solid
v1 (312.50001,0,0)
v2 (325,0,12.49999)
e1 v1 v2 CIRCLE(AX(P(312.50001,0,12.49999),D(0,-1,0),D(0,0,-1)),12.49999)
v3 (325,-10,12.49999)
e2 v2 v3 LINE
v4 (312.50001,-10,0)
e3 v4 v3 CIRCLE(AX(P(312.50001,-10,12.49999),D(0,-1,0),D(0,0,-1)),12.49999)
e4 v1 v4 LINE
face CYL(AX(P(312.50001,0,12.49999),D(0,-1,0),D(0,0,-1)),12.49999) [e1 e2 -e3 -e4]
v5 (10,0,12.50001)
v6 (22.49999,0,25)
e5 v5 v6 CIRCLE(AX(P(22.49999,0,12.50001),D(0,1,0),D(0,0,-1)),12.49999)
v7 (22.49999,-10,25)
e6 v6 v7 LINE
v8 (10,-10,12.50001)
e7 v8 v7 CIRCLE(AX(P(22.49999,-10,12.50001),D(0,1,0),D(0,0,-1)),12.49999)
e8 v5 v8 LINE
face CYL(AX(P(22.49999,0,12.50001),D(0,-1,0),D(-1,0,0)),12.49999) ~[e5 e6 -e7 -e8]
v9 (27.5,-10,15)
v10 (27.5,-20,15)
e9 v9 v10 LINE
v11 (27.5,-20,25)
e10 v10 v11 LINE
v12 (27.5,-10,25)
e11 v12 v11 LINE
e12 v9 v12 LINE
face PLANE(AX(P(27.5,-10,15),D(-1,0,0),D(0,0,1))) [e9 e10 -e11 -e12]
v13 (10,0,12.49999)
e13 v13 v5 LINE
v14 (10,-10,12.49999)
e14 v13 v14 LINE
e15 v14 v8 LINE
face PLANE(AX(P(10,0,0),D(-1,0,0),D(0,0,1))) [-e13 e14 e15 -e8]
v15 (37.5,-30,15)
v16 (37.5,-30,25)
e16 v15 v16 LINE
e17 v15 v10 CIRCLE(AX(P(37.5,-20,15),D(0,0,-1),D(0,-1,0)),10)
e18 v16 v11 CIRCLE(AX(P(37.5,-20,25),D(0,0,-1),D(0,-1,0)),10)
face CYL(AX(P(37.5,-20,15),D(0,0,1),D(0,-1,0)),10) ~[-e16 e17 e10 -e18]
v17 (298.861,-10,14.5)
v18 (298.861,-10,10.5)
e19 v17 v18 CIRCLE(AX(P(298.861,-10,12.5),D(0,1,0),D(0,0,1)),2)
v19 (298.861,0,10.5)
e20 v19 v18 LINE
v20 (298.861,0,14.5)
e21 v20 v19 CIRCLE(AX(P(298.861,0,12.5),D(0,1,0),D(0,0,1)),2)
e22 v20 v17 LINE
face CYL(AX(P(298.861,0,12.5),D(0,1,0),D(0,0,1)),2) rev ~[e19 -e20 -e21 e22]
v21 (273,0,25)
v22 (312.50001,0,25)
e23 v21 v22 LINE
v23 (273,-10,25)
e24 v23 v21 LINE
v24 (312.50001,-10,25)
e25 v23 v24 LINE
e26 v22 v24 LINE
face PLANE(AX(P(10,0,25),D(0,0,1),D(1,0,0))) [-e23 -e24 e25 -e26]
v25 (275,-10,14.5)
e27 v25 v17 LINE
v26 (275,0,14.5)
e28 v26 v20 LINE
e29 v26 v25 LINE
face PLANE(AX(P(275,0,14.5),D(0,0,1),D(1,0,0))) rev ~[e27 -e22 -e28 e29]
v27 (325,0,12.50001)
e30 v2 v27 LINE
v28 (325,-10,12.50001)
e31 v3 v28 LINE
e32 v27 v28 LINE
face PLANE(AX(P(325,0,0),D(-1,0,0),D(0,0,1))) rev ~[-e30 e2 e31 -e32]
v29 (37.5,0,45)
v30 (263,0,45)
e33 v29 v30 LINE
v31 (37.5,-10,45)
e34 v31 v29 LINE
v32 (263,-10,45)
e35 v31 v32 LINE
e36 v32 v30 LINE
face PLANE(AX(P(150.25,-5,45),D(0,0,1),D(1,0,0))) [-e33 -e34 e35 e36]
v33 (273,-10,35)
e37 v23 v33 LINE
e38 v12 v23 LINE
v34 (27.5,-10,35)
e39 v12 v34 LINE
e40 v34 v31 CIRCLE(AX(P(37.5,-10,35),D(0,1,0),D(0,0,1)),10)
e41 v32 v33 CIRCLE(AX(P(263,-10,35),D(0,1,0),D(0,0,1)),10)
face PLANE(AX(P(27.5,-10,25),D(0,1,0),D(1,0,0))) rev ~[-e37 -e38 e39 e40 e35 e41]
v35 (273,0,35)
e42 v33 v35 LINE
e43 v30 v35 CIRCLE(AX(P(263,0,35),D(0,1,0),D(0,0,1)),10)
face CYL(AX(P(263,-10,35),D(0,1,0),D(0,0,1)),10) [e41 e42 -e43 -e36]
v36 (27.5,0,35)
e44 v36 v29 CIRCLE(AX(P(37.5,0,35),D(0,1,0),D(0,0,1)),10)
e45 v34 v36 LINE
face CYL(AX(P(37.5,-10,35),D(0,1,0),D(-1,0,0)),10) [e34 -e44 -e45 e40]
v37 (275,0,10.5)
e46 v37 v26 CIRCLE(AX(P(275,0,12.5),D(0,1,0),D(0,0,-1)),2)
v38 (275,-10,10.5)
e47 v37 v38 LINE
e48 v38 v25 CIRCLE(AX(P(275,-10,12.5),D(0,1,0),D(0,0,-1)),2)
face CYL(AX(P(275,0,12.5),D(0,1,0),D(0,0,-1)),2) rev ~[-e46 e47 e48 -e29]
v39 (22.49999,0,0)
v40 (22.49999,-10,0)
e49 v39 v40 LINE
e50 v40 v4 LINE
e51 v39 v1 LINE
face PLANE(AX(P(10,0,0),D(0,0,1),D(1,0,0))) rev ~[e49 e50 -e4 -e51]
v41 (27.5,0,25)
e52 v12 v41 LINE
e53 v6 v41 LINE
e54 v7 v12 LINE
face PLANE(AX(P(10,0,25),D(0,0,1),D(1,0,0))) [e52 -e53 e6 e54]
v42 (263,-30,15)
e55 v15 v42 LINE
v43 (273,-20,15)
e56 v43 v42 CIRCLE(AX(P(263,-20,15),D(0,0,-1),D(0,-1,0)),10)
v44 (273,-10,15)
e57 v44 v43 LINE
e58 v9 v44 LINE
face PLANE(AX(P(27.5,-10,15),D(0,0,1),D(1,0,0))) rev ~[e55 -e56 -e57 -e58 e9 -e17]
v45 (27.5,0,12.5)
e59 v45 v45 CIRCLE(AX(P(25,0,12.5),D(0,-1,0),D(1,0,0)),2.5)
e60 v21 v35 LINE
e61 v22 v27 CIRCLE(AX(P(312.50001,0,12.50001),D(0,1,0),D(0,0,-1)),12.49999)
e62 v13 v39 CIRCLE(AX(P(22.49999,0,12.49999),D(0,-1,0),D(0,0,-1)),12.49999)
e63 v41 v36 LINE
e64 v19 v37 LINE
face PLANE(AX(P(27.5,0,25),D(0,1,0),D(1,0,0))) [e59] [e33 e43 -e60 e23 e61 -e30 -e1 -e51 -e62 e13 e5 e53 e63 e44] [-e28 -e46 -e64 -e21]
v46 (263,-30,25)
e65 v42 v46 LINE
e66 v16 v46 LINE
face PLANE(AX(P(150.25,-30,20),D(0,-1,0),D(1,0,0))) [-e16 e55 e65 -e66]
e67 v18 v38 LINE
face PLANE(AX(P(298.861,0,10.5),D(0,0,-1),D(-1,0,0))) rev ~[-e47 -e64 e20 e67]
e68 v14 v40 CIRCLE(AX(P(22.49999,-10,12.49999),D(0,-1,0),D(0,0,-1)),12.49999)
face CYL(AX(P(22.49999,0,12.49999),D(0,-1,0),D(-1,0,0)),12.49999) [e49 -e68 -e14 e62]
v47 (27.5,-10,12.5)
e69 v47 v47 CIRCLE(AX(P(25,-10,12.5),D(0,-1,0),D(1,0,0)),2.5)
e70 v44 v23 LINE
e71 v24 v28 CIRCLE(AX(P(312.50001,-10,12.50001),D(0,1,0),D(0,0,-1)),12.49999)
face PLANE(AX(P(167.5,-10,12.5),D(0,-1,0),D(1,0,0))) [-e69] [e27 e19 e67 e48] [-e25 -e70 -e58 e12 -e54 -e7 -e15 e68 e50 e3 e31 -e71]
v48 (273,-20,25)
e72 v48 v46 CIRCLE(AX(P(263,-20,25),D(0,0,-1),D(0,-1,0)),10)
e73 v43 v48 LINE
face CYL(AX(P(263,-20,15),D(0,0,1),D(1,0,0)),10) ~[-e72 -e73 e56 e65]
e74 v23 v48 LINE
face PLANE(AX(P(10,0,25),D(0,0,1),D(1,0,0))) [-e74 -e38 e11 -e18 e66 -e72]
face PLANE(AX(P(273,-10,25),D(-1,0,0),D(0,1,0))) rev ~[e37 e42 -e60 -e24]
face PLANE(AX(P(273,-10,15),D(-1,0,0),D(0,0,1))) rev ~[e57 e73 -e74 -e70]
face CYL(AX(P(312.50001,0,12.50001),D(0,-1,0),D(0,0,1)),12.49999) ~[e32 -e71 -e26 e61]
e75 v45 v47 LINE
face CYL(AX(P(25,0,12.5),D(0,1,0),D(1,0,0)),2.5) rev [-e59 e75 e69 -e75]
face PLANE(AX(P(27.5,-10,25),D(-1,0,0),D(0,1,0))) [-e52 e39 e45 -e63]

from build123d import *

# Parameters (mm, degrees)
F0_W     = 315
F0_H     = 25
F0_R     = 2.5
F1_DEPTH = 10
F2_R     = 12.49999
F3_W     = 245.5
F3_H     = 10
F4_DEPTH = 20
F5_W     = 245.5
F5_H     = 10
F6_DEPTH = 20
F7_R     = 10
F8_R     = 10


# Not quite as in the source:
# - a fillet or chamfer is up to 0.001 mm smaller than in the source, because OpenCascade refuses the exact size


with BuildPart() as f1:
    # F0 (on Front) → F1 (new body)
    with BuildSketch(Plane.XZ):
        with Locations((167.5, 12.5)):
            Rectangle(F0_W, F0_H)
        with Locations((25, 12.5)):
            Circle(F0_R, mode=Mode.SUBTRACT)
        with BuildLine():
            ThreePointArc((298.861, 14.5), (300.861, 12.5), (298.861, 10.5))
            Line((298.861, 10.5), (275, 10.5))
            ThreePointArc((275, 10.5), (273, 12.5), (275, 14.5))
            Line((275, 14.5), (298.861, 14.5))
        make_face(mode=Mode.SUBTRACT)
    extrude(amount=F1_DEPTH)

    # F2 (radius 12.5 in the source; OpenCascade refuses exactly that, so slightly less here)
    f2_edges = [f1.edges().sort_by_distance(p)[0] for p in [
        (10, -5, 25),
        (10, -5, 0),
        (325, -5, 0),
        (325, -5, 25),
    ]]
    fillet(f2_edges, radius=F2_R)

    # F3 (on face) → F4 (join)
    with BuildSketch(Plane.XZ.offset(10)):
        with Locations((150.25, 20)):
            Rectangle(F3_W, F3_H)
    extrude(amount=F4_DEPTH)

    # F5 (on face) → F6 (join)
    with BuildSketch(Plane.XY.offset(25)):
        with Locations((150.25, -5)):
            Rectangle(F5_W, F5_H)
    extrude(amount=F6_DEPTH)

    # F7
    f7_edges = [f1.edges().sort_by_distance(p)[0] for p in [
        (27.5, -5, 45),
    ]]
    fillet(f7_edges, radius=F7_R)

    # F8
    f8_edges = [f1.edges().sort_by_distance(p)[0] for p in [
        (273, -5, 45),
        (273, -30, 20),
        (27.5, -30, 20),
    ]]
    fillet(f8_edges, radius=F8_R)


solid = f1.part
